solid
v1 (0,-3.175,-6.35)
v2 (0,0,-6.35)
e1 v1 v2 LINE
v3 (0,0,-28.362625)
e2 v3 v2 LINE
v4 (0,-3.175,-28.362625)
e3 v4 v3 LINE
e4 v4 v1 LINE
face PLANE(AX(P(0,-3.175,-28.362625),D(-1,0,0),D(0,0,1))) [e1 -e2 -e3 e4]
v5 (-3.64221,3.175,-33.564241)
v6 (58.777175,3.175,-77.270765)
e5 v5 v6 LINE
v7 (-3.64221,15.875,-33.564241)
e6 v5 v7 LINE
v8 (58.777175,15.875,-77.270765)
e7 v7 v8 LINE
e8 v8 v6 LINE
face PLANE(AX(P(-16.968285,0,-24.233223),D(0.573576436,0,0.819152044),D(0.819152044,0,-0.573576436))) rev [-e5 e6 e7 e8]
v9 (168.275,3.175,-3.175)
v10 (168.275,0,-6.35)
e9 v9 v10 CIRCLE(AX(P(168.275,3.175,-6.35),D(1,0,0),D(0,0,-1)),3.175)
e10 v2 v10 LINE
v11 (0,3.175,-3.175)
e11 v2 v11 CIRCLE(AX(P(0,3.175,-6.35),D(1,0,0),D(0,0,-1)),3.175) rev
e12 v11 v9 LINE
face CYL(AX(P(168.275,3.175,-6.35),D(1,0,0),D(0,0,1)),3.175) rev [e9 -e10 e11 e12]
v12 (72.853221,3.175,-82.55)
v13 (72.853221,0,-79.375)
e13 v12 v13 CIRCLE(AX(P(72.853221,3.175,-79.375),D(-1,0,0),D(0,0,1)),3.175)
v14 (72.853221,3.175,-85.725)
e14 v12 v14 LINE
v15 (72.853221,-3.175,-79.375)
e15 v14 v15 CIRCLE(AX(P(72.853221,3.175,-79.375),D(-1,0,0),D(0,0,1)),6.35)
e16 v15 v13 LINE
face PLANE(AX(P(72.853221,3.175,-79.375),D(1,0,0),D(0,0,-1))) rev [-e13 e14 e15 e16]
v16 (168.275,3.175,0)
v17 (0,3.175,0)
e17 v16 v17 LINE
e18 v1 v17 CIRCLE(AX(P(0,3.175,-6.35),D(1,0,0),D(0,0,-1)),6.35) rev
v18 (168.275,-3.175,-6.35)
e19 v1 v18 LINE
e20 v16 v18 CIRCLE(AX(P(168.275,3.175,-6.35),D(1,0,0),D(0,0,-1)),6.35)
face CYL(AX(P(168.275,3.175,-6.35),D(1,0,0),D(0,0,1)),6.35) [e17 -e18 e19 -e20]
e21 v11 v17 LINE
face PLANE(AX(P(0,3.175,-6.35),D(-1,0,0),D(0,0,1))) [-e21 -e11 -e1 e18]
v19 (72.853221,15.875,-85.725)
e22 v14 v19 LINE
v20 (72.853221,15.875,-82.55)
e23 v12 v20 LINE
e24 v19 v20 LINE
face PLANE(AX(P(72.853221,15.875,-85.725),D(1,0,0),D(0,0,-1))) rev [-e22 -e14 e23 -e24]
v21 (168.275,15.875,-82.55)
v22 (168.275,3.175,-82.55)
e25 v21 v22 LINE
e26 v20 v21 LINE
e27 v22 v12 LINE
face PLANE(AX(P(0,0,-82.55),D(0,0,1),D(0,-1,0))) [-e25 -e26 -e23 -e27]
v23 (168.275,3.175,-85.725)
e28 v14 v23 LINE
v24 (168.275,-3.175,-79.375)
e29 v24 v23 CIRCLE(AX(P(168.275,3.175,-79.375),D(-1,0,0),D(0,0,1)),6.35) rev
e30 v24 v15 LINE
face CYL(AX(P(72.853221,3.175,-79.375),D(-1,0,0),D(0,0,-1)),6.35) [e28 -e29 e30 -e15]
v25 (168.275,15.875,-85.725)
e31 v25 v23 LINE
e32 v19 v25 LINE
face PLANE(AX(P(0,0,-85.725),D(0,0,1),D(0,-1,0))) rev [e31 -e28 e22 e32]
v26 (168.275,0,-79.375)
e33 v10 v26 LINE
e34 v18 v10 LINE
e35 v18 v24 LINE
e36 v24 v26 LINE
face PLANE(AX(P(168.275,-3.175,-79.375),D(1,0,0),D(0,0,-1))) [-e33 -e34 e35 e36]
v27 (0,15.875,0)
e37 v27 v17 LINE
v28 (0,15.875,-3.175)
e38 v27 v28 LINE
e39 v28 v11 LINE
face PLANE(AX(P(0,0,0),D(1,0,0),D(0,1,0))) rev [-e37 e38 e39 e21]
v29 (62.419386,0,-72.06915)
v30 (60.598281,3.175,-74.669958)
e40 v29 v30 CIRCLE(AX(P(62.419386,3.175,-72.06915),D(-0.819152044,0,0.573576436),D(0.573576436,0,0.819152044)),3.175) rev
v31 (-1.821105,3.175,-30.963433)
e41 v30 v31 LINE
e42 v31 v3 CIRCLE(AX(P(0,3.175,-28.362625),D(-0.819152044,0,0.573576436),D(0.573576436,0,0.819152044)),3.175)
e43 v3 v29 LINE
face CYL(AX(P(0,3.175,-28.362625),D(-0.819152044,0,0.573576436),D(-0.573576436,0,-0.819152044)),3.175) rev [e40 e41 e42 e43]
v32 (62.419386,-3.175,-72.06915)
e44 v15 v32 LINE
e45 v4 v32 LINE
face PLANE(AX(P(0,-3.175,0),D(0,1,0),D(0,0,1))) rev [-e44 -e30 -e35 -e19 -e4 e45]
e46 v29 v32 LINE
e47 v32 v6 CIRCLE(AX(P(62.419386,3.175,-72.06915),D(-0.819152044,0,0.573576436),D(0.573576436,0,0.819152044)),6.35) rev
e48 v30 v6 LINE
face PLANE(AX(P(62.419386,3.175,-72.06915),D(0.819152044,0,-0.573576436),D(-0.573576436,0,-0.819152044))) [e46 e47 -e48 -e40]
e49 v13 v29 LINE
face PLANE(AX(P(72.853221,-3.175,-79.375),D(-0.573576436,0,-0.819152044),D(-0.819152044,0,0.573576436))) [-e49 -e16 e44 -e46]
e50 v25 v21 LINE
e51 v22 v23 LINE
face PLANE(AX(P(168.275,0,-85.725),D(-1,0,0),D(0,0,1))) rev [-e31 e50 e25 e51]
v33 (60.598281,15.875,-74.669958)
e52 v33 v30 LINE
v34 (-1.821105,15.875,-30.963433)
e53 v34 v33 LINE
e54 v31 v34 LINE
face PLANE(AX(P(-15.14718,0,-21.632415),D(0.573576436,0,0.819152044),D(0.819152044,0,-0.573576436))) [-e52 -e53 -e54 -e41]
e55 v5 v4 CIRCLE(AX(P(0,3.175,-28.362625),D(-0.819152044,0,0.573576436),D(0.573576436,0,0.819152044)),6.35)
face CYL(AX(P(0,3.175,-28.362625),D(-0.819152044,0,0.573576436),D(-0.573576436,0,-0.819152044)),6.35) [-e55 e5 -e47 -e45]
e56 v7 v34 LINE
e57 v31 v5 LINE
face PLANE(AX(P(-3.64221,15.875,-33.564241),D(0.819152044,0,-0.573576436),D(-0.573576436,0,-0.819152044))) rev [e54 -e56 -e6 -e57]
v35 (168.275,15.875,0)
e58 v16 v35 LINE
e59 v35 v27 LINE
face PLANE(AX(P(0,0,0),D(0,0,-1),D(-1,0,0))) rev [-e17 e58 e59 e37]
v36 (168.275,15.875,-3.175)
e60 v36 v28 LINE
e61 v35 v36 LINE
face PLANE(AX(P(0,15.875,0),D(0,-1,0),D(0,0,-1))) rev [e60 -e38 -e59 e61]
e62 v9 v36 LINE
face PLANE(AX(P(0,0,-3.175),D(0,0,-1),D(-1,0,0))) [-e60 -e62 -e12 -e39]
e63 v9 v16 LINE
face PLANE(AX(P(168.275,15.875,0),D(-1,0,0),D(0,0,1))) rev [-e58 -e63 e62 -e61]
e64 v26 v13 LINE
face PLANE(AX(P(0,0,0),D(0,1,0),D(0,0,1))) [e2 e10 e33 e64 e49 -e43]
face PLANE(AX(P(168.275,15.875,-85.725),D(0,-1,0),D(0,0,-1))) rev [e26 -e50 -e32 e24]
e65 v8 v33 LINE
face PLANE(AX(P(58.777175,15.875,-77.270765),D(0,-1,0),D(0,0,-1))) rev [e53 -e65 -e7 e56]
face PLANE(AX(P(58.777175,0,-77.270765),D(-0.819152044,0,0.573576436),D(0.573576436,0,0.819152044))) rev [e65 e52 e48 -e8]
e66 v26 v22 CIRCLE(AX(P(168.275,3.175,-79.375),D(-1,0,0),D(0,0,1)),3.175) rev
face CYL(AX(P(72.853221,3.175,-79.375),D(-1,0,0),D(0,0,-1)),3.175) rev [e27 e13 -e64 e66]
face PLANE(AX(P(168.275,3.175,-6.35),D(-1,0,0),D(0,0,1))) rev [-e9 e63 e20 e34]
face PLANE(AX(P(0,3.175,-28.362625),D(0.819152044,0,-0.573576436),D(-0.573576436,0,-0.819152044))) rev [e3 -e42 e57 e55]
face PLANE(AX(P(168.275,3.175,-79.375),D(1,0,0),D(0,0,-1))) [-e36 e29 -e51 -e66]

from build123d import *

# Parameters (mm, degrees)
BASE_FLANGE1_DEPTH        = 3.175
EDGE_FLANGE1_DEPTH        = 95.421779032
EDGE_FLANGE1_BEND_DEPTH   = 168.275
EDGE_FLANGE1_BEND_2_DEPTH = 76.2


# Sheet-metal steps are written as plain solids
with BuildPart() as part:
    # Sketch1 → Base-Flange1 (new body)
    with BuildSketch(Plane(origin=(0, 0, 0), x_dir=(1, 0, 0), z_dir=(0, 1, 0))):
        Polygon((168.275, 79.375), (72.853220968, 79.375), (0, 28.362625496), (0, 6.35), (168.275, 6.35), align=None)
    extrude(amount=-BASE_FLANGE1_DEPTH)

    # Edge-Flange1 section (across the edge) → Edge-Flange1 (add)
    with BuildSketch(Plane(origin=(168.275, 0, -82.55), x_dir=(0, 0, 1), z_dir=(-1, 0, 0))):
        with BuildLine():
            Line((-3.175, 3.175), (-3.175, 15.875))
            Line((-3.175, 15.875), (0, 15.875))
            Line((0, 15.875), (0, 3.175))
            ThreePointArc((0, 3.175), (0.92993597, 0.92993597), (3.175, 0))
            Line((3.175, 0), (3.175, -3.175))
            ThreePointArc((3.175, -3.175), (-1.315128061, -1.315128061), (-3.175, 3.175))
        make_face()
    extrude(amount=EDGE_FLANGE1_DEPTH)

    # Edge-Flange1 section 2 (across the edge) → Edge-Flange1 bend (add)
    with BuildSketch(Plane(origin=(0, 0, -3.175), x_dir=(0, 0, -1), z_dir=(1, 0, 0))):
        with BuildLine():
            Line((-3.175, 3.175), (-3.175, 15.875))
            Line((-3.175, 15.875), (0, 15.875))
            Line((0, 15.875), (0, 3.175))
            ThreePointArc((0, 3.175), (0.92993597, 0.92993597), (3.175, 0))
            Line((3.175, 0), (3.175, -3.175))
            ThreePointArc((3.175, -3.175), (-1.315128061, -1.315128061), (-3.175, 3.175))
        make_face()
    extrude(amount=EDGE_FLANGE1_BEND_DEPTH)

    # Edge-Flange1 section 3 (across the edge) → Edge-Flange1 bend 2 (add)
    with BuildSketch(Plane(origin=(60.598280589, 0, -74.669957686), x_dir=(0.5735764363510473, 3.491481338843133e-15, 0.819152044288991), z_dir=(-0.819152044288991, 0, 0.5735764363510473))):
        with BuildLine():
            Line((-3.175, 3.175), (-3.175, 15.875))
            Line((-3.175, 15.875), (0, 15.875))
            Line((0, 15.875), (0, 3.175))
            ThreePointArc((0, 3.175), (0.92993597, 0.92993597), (3.175, 0))
            Line((3.175, 0), (3.175, -3.175))
            ThreePointArc((3.175, -3.175), (-1.315128061, -1.315128061), (-3.175, 3.175))
        make_face()
    extrude(amount=EDGE_FLANGE1_BEND_2_DEPTH)


solid = part.part
